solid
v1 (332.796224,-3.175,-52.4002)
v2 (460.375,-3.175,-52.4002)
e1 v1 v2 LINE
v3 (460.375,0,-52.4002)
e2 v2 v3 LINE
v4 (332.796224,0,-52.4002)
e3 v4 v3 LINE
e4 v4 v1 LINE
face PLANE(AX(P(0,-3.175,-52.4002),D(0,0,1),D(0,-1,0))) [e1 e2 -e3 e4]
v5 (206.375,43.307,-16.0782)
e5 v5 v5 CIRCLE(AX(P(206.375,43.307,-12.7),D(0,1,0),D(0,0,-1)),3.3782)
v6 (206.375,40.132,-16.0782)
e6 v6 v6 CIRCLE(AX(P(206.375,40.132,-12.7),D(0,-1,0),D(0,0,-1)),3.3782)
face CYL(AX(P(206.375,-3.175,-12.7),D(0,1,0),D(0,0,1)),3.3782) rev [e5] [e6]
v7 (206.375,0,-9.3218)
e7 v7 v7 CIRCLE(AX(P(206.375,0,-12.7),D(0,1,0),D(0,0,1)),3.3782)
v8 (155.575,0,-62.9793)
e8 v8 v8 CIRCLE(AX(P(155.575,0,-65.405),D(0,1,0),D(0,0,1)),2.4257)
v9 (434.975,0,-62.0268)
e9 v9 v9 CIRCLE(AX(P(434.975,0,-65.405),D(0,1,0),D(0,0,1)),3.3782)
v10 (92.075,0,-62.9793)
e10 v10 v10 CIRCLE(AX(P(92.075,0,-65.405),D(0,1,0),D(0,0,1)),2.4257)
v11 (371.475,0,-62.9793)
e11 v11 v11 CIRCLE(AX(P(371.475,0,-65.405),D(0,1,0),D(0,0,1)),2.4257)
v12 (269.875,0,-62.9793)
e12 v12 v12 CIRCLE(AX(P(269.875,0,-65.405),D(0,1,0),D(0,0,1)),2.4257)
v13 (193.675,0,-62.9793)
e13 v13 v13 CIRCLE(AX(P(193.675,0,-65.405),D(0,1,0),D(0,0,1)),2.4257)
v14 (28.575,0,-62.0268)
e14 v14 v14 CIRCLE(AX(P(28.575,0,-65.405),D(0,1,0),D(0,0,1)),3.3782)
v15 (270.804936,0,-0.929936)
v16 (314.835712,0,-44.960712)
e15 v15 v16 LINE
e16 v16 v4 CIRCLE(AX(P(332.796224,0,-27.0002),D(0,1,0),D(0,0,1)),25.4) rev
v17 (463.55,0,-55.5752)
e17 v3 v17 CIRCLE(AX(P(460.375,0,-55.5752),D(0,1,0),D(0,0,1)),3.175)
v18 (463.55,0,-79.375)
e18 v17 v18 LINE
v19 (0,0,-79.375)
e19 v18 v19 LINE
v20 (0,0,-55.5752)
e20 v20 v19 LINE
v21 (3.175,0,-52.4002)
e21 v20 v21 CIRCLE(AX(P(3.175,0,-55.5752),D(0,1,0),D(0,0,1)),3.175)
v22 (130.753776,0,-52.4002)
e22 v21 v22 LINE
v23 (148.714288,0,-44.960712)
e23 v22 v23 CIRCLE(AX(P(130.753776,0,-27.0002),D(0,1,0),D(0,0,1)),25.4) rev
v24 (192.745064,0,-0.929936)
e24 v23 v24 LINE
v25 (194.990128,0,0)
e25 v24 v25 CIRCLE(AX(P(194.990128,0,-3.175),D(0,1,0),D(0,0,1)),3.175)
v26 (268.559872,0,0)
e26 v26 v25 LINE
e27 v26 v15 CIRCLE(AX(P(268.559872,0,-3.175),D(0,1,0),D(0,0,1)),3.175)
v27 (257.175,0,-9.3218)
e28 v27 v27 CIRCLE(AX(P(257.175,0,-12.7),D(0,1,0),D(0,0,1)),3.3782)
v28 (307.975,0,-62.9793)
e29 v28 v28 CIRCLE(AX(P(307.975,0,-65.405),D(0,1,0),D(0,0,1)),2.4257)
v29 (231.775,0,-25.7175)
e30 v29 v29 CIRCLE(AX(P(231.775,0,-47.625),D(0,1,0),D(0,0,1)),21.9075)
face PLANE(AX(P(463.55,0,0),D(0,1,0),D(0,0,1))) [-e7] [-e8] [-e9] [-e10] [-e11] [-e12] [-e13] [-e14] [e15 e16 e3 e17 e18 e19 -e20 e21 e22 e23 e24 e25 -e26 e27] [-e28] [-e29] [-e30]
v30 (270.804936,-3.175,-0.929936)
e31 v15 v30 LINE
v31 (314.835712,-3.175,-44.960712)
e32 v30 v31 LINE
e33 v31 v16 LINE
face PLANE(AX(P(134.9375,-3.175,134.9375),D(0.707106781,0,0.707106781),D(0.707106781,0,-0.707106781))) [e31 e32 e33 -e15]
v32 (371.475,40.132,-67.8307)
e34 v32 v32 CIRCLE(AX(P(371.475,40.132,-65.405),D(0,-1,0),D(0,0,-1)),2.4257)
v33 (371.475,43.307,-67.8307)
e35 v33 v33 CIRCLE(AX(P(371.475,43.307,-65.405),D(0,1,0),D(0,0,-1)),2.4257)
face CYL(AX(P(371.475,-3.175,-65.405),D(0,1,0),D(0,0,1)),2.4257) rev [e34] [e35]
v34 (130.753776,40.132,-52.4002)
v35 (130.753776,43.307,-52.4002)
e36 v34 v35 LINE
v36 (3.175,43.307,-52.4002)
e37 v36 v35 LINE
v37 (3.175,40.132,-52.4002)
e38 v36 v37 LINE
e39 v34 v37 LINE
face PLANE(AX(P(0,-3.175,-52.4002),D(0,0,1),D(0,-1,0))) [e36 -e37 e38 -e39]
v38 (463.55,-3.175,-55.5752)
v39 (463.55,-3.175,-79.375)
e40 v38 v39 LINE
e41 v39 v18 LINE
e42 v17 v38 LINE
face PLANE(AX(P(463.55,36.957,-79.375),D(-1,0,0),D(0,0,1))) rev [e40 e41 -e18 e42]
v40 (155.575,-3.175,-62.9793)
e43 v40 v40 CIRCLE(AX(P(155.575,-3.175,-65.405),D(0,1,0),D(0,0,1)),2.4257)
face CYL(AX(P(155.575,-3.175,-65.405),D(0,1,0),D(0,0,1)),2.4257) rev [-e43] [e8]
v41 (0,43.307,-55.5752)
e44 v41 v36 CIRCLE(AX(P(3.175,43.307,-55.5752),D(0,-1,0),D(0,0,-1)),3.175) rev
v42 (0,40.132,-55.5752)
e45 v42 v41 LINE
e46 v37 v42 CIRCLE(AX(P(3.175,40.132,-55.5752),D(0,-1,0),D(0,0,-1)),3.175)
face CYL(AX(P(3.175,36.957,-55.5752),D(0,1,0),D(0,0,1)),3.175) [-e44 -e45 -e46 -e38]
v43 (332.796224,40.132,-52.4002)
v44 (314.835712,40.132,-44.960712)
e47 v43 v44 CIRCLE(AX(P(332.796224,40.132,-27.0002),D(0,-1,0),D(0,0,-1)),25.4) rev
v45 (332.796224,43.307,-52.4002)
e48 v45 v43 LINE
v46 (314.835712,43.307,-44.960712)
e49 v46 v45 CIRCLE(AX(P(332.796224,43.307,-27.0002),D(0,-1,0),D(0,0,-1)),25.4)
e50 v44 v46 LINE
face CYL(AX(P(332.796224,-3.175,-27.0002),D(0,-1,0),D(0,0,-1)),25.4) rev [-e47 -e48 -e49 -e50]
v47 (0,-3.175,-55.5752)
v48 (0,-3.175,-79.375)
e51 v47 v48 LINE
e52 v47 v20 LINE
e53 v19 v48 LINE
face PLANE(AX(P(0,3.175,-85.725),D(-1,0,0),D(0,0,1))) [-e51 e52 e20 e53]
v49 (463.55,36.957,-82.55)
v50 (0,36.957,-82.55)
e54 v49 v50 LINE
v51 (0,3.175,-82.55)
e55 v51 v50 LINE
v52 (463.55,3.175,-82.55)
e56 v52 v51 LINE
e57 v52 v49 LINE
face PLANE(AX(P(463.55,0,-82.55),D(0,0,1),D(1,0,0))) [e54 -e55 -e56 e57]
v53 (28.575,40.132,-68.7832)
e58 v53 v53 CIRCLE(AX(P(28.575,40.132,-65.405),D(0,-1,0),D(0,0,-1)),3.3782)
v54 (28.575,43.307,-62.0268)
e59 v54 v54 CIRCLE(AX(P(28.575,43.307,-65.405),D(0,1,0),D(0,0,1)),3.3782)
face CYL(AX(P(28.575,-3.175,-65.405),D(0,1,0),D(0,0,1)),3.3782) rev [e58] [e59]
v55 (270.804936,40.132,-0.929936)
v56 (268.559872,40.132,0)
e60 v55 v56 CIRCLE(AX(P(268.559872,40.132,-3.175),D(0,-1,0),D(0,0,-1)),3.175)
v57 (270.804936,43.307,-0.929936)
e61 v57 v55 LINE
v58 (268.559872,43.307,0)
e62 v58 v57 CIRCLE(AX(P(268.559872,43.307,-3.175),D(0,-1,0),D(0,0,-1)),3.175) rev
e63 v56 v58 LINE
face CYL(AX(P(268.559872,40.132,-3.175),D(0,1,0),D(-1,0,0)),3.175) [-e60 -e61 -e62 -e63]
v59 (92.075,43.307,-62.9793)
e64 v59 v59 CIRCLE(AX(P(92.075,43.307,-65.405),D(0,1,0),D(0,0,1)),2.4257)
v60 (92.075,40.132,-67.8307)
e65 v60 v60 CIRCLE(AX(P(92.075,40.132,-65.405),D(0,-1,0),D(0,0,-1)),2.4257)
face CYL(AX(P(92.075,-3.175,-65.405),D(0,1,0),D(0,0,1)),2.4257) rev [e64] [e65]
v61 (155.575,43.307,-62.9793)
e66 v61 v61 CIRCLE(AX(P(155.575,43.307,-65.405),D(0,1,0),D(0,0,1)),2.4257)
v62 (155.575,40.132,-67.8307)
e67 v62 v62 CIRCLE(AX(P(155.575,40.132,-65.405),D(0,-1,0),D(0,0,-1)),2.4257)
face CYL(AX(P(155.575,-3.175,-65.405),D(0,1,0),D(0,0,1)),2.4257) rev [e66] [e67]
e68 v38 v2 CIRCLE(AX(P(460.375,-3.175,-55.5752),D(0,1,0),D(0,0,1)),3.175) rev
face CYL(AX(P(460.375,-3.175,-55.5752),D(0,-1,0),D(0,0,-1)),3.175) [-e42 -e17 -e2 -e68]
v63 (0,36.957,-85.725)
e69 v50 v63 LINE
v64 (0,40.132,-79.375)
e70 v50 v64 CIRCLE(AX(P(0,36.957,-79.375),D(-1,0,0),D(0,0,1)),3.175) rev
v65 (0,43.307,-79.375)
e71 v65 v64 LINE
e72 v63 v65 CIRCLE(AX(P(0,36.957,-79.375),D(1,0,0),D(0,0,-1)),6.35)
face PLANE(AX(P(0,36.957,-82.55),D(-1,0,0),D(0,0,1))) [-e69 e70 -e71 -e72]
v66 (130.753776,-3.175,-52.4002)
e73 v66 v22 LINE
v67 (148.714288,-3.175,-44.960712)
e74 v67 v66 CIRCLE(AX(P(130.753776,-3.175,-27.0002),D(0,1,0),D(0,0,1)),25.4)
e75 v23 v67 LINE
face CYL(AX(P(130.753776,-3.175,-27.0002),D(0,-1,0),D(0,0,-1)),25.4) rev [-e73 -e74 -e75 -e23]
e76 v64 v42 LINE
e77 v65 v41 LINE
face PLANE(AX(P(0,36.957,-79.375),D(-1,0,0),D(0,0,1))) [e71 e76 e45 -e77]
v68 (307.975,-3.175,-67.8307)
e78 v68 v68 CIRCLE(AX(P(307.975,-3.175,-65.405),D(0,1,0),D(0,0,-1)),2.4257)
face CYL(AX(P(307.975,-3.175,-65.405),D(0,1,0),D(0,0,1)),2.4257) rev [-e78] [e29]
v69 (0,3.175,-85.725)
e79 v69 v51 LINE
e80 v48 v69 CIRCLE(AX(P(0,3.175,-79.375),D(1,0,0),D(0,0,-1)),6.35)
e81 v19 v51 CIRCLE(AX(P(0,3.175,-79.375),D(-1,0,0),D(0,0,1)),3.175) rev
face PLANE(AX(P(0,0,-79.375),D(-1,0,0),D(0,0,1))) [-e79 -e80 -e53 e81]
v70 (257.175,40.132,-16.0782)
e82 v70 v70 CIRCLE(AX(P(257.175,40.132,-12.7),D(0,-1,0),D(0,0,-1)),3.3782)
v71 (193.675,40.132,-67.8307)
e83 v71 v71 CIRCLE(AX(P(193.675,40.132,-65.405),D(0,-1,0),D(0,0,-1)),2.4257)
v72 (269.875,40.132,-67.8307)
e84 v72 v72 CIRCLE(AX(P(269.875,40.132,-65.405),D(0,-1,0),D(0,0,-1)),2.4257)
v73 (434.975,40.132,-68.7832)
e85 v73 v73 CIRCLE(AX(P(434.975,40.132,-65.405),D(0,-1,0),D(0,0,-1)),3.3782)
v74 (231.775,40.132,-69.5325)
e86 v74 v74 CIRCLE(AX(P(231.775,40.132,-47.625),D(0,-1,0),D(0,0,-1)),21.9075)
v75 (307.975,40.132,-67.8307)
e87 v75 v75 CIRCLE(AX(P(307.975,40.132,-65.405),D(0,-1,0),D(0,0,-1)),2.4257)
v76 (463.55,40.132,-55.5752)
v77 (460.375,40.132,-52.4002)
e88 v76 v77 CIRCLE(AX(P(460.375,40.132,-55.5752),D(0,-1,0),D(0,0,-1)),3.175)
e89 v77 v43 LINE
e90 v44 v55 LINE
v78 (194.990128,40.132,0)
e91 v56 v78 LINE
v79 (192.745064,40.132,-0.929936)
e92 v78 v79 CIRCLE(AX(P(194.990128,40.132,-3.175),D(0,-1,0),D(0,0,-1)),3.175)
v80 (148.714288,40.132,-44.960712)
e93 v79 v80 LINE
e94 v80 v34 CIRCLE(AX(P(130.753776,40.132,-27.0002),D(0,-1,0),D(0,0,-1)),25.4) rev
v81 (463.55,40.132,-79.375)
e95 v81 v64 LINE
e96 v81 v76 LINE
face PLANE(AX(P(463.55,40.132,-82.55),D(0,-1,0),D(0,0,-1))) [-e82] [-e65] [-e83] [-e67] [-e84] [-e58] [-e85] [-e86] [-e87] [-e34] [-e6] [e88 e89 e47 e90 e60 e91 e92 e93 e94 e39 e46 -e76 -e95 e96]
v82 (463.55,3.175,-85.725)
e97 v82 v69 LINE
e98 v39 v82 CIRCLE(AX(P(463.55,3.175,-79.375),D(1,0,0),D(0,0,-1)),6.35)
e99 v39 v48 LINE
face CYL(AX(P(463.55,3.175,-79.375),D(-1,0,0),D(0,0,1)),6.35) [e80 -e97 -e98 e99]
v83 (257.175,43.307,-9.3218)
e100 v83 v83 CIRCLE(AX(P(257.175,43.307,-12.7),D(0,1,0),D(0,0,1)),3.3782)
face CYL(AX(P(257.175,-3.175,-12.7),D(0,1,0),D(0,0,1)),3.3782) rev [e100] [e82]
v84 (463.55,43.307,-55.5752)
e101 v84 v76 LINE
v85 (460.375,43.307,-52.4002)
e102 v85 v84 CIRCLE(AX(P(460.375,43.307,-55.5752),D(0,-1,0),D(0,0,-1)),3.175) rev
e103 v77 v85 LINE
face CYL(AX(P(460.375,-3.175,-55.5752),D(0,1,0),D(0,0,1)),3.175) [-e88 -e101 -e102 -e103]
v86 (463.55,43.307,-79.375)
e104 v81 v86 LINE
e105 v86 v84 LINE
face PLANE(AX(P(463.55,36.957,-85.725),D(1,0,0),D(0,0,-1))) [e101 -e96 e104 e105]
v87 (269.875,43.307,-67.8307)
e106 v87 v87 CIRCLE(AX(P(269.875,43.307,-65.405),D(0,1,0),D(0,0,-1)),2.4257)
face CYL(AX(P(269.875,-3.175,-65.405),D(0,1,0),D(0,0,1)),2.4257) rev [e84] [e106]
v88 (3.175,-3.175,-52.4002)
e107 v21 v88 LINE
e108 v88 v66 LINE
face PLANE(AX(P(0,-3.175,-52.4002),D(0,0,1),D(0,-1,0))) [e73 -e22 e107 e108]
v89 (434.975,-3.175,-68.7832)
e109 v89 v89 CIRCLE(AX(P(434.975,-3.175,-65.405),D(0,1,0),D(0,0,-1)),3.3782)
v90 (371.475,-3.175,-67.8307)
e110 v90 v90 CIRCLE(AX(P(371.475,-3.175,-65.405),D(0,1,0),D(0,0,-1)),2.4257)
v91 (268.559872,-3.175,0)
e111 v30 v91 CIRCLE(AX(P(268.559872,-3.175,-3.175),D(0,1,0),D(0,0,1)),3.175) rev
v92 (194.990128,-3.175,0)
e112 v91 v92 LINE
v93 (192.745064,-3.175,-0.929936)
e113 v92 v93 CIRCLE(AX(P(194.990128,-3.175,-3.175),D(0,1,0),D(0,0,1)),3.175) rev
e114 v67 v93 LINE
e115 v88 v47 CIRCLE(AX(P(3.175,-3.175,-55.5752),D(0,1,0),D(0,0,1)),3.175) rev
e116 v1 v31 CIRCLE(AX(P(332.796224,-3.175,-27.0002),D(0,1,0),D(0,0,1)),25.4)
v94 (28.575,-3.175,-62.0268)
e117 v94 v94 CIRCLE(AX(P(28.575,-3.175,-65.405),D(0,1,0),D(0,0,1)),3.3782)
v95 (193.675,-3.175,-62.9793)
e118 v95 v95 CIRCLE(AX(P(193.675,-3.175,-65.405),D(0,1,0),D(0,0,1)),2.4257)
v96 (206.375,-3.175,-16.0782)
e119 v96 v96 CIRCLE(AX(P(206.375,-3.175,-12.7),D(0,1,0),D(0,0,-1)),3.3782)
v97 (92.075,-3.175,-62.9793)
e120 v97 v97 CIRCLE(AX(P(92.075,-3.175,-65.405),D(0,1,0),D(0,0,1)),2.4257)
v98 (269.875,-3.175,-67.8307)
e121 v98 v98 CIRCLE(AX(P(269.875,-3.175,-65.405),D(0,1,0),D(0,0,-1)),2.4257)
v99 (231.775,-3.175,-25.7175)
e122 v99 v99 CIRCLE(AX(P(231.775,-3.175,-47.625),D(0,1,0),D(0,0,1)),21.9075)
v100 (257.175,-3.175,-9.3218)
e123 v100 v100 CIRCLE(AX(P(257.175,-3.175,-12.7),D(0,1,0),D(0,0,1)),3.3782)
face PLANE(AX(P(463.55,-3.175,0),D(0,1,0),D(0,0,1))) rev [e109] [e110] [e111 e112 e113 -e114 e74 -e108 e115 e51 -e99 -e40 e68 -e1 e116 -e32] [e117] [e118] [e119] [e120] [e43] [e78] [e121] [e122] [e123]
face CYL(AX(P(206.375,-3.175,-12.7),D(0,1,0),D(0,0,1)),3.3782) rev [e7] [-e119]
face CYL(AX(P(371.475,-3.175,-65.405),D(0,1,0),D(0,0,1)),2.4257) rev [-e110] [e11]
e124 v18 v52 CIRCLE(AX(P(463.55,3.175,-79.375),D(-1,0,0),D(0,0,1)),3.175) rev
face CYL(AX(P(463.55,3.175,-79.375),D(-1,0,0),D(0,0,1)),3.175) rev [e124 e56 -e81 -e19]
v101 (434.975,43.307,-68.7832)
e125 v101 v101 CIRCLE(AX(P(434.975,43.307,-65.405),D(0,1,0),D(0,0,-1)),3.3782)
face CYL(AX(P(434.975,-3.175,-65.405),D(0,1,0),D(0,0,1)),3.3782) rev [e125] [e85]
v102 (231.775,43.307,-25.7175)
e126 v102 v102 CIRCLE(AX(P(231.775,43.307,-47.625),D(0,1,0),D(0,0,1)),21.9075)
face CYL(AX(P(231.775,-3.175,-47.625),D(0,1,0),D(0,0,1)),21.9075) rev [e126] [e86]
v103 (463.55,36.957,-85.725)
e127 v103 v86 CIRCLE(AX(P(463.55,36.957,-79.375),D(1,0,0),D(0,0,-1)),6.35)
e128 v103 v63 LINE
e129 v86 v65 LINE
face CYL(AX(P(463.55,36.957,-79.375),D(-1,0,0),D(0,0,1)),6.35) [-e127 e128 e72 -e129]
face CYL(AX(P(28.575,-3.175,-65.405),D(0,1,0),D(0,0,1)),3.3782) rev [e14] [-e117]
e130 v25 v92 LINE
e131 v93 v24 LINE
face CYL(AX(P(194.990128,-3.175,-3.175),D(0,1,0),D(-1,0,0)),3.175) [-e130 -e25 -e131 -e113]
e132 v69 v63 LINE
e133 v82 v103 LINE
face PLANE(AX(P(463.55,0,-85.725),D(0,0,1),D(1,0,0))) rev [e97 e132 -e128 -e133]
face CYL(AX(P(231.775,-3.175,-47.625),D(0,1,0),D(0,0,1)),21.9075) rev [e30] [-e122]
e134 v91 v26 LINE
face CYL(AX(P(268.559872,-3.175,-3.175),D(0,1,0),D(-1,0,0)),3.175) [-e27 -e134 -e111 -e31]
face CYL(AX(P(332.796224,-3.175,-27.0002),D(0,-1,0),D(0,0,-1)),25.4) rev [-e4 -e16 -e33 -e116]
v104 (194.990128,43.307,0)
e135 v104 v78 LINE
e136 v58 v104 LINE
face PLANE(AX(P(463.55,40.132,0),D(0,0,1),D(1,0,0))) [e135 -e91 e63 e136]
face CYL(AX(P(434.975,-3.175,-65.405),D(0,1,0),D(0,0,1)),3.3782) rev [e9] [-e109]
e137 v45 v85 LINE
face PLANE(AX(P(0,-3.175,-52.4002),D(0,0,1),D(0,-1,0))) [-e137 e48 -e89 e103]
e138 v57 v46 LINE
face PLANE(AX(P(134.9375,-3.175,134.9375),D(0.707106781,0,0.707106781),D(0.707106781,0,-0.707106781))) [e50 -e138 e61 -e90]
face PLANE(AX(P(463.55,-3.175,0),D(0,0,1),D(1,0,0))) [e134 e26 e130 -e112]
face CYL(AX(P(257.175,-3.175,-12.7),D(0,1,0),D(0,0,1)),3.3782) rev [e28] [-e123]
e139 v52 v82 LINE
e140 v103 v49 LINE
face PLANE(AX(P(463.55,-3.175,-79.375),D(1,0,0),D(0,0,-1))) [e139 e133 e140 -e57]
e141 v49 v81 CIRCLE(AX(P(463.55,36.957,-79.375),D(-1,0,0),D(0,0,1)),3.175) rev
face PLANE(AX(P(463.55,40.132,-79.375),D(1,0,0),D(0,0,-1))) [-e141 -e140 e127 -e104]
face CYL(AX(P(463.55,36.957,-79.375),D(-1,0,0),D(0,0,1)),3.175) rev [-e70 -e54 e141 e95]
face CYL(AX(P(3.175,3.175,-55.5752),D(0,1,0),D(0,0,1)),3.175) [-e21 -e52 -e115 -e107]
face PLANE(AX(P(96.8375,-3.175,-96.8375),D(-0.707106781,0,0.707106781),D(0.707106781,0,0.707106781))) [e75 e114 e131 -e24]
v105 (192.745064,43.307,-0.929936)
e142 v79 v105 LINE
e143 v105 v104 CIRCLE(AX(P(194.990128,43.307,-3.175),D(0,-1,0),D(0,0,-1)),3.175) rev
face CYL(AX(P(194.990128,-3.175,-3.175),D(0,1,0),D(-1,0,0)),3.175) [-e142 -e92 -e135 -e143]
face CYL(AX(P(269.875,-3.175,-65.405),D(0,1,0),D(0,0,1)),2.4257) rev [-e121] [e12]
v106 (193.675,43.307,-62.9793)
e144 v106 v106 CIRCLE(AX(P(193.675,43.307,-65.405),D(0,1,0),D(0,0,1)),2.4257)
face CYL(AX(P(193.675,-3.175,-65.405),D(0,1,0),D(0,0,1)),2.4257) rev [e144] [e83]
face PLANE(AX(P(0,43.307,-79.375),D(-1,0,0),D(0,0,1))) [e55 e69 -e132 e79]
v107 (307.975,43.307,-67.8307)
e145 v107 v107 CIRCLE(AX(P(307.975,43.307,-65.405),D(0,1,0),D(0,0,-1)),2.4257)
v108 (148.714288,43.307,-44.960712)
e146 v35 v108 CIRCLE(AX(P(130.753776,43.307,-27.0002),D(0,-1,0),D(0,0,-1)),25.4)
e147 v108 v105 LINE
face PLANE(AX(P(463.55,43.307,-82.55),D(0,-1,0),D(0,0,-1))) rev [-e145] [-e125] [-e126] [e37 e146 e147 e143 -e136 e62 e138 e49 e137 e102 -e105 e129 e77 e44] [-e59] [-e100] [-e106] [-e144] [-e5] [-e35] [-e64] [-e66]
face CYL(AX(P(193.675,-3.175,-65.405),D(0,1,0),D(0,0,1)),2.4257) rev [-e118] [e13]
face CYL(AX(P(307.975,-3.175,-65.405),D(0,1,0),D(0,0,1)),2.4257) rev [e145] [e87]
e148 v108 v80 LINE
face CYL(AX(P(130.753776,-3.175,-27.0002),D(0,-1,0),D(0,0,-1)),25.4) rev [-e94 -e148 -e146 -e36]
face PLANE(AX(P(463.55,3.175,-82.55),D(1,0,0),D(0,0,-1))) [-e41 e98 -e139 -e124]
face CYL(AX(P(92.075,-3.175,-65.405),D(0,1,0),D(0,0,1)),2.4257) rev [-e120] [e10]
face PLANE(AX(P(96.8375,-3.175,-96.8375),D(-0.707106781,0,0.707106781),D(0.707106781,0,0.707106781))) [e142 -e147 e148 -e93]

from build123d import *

# Parameters (mm, degrees)
BASE_FLANGE1_DEPTH = 463.55
SKETCH6_R          = 21.9075
CUT_EXTRUDE1_DEPTH = 474.696057033
CUT_EXTRUDE2_DEPTH = 474.696057033
SKETCH8_R          = 3.3782
SKETCH8_R_2        = 2.4257
CUT_EXTRUDE3_DEPTH = 474.696057033
SKETCH9_R          = 3.3782
CUT_EXTRUDE4_DEPTH = 474.696057033
FILLET1_R          = 25.4
FILLET2_R          = 3.175


# Sheet-metal steps are written as plain solids
with BuildPart() as part:
    # Sketch1 → Base-Flange1 (new body)
    with BuildSketch(Plane(origin=(0, 0, 0), x_dir=(0, 0, -1), z_dir=(1, 0, 0))):
        with BuildLine():
            Line((0, 0), (79.375, 0))
            ThreePointArc((79.375, 0), (81.62006403, 0.92993597), (82.55, 3.175))
            Line((82.55, 3.175), (82.55, 36.957))
            ThreePointArc((82.55, 36.957), (81.62006403, 39.20206403), (79.375, 40.132))
            Line((79.375, 40.132), (0, 40.132))
            Line((0, 40.132), (0, 43.307))
            Line((0, 43.307), (79.375, 43.307))
            ThreePointArc((79.375, 43.307), (83.865128061, 41.447128061), (85.725, 36.957))
            Line((85.725, 36.957), (85.725, 3.175))
            ThreePointArc((85.725, 3.175), (83.865128061, -1.315128061), (79.375, -3.175))
            Line((79.375, -3.175), (0, -3.175))
            Line((0, -3.175), (0, 0))
        make_face()
    extrude(amount=BASE_FLANGE1_DEPTH)

    # Sketch6 → Cut-Extrude1 (cut, through all)
    with BuildSketch(Plane(origin=(0, 43.307, 0), x_dir=(1, 0, 0), z_dir=(0, 1, 0))):
        with Locations(Location((231.775, 47.625, 0), (0, 0, 270))):
            Circle(SKETCH6_R)
    extrude(amount=-CUT_EXTRUDE1_DEPTH, mode=Mode.SUBTRACT)

    # Sketch7 → Cut-Extrude2 (cut, through all)
    with BuildSketch(Plane(origin=(0, 43.307, 0), x_dir=(1, 0, 0), z_dir=(0, 1, 0))):
        Polygon((141.2748, 52.4002), (0, 52.4002), (0, 0), (193.675, 0), align=None)
        Polygon((322.2752, 52.4002), (269.875, 0), (463.55, 0), (463.55, 52.4002), align=None)
    extrude(amount=-CUT_EXTRUDE2_DEPTH, mode=Mode.SUBTRACT)

    # Sketch8 → Cut-Extrude3 (cut, through all)
    with BuildSketch(Plane(origin=(0, 43.307, 0), x_dir=(1, 0, 0), z_dir=(0, 1, 0))):
        with Locations(Location((28.575, 65.405, 0), (0, 0, 270))):
            Circle(SKETCH8_R)
        with Locations(Location((92.075, 65.405, 0), (0, 0, 270))):
            Circle(SKETCH8_R_2)
        with Locations(Location((193.675, 65.405, 0), (0, 0, 270))):
            Circle(SKETCH8_R_2)
        with Locations(Location((269.875, 65.405, 0), (0, 0, 270))):
            Circle(SKETCH8_R_2)
        with Locations(Location((371.475, 65.405, 0), (0, 0, 270))):
            Circle(SKETCH8_R_2)
        with Locations(Location((434.975, 65.405, 0), (0, 0, 270))):
            Circle(SKETCH8_R)
        with Locations(Location((155.575, 65.405, 0), (0, 0, 270))):
            Circle(SKETCH8_R_2)
        with Locations(Location((307.975, 65.405, 0), (0, 0, 270))):
            Circle(SKETCH8_R_2)
    extrude(amount=-CUT_EXTRUDE3_DEPTH, mode=Mode.SUBTRACT)

    # Sketch9 → Cut-Extrude4 (cut, through all)
    with BuildSketch(Plane(origin=(0, 43.307, 0), x_dir=(1, 0, 0), z_dir=(0, 1, 0))):
        with Locations(Location((257.175, 12.7, 0), (0, 0, 270))):
            Circle(SKETCH9_R)
        with Locations(Location((206.375, 12.7, 0), (0, 0, 270))):
            Circle(SKETCH9_R)
    extrude(amount=-CUT_EXTRUDE4_DEPTH, mode=Mode.SUBTRACT)

    # Fillet1
    fillet1_edges = [part.edges().sort_by_distance(p)[0] for p in [
        (141.2748, 41.7195, -52.4002),
        (141.2748, -1.5875, -52.4002),
        (322.2752, 41.7195, -52.4002),
        (322.2752, -1.5875, -52.4002),
    ]]
    fillet(fillet1_edges, radius=FILLET1_R)

    # Fillet2
    fillet2_edges = [part.edges().sort_by_distance(p)[0] for p in [
        (0, 41.7195, -52.4002),
        (193.675, 41.7195, 0),
        (193.675, -1.5875, 0),
        (0, -1.5875, -52.4002),
        (463.55, 41.7195, -52.4002),
        (269.875, 41.7195, 0),
        (463.55, -1.5875, -52.4002),
        (269.875, -1.5875, 0),
    ]]
    fillet(fillet2_edges, radius=FILLET2_R)


solid = part.part
